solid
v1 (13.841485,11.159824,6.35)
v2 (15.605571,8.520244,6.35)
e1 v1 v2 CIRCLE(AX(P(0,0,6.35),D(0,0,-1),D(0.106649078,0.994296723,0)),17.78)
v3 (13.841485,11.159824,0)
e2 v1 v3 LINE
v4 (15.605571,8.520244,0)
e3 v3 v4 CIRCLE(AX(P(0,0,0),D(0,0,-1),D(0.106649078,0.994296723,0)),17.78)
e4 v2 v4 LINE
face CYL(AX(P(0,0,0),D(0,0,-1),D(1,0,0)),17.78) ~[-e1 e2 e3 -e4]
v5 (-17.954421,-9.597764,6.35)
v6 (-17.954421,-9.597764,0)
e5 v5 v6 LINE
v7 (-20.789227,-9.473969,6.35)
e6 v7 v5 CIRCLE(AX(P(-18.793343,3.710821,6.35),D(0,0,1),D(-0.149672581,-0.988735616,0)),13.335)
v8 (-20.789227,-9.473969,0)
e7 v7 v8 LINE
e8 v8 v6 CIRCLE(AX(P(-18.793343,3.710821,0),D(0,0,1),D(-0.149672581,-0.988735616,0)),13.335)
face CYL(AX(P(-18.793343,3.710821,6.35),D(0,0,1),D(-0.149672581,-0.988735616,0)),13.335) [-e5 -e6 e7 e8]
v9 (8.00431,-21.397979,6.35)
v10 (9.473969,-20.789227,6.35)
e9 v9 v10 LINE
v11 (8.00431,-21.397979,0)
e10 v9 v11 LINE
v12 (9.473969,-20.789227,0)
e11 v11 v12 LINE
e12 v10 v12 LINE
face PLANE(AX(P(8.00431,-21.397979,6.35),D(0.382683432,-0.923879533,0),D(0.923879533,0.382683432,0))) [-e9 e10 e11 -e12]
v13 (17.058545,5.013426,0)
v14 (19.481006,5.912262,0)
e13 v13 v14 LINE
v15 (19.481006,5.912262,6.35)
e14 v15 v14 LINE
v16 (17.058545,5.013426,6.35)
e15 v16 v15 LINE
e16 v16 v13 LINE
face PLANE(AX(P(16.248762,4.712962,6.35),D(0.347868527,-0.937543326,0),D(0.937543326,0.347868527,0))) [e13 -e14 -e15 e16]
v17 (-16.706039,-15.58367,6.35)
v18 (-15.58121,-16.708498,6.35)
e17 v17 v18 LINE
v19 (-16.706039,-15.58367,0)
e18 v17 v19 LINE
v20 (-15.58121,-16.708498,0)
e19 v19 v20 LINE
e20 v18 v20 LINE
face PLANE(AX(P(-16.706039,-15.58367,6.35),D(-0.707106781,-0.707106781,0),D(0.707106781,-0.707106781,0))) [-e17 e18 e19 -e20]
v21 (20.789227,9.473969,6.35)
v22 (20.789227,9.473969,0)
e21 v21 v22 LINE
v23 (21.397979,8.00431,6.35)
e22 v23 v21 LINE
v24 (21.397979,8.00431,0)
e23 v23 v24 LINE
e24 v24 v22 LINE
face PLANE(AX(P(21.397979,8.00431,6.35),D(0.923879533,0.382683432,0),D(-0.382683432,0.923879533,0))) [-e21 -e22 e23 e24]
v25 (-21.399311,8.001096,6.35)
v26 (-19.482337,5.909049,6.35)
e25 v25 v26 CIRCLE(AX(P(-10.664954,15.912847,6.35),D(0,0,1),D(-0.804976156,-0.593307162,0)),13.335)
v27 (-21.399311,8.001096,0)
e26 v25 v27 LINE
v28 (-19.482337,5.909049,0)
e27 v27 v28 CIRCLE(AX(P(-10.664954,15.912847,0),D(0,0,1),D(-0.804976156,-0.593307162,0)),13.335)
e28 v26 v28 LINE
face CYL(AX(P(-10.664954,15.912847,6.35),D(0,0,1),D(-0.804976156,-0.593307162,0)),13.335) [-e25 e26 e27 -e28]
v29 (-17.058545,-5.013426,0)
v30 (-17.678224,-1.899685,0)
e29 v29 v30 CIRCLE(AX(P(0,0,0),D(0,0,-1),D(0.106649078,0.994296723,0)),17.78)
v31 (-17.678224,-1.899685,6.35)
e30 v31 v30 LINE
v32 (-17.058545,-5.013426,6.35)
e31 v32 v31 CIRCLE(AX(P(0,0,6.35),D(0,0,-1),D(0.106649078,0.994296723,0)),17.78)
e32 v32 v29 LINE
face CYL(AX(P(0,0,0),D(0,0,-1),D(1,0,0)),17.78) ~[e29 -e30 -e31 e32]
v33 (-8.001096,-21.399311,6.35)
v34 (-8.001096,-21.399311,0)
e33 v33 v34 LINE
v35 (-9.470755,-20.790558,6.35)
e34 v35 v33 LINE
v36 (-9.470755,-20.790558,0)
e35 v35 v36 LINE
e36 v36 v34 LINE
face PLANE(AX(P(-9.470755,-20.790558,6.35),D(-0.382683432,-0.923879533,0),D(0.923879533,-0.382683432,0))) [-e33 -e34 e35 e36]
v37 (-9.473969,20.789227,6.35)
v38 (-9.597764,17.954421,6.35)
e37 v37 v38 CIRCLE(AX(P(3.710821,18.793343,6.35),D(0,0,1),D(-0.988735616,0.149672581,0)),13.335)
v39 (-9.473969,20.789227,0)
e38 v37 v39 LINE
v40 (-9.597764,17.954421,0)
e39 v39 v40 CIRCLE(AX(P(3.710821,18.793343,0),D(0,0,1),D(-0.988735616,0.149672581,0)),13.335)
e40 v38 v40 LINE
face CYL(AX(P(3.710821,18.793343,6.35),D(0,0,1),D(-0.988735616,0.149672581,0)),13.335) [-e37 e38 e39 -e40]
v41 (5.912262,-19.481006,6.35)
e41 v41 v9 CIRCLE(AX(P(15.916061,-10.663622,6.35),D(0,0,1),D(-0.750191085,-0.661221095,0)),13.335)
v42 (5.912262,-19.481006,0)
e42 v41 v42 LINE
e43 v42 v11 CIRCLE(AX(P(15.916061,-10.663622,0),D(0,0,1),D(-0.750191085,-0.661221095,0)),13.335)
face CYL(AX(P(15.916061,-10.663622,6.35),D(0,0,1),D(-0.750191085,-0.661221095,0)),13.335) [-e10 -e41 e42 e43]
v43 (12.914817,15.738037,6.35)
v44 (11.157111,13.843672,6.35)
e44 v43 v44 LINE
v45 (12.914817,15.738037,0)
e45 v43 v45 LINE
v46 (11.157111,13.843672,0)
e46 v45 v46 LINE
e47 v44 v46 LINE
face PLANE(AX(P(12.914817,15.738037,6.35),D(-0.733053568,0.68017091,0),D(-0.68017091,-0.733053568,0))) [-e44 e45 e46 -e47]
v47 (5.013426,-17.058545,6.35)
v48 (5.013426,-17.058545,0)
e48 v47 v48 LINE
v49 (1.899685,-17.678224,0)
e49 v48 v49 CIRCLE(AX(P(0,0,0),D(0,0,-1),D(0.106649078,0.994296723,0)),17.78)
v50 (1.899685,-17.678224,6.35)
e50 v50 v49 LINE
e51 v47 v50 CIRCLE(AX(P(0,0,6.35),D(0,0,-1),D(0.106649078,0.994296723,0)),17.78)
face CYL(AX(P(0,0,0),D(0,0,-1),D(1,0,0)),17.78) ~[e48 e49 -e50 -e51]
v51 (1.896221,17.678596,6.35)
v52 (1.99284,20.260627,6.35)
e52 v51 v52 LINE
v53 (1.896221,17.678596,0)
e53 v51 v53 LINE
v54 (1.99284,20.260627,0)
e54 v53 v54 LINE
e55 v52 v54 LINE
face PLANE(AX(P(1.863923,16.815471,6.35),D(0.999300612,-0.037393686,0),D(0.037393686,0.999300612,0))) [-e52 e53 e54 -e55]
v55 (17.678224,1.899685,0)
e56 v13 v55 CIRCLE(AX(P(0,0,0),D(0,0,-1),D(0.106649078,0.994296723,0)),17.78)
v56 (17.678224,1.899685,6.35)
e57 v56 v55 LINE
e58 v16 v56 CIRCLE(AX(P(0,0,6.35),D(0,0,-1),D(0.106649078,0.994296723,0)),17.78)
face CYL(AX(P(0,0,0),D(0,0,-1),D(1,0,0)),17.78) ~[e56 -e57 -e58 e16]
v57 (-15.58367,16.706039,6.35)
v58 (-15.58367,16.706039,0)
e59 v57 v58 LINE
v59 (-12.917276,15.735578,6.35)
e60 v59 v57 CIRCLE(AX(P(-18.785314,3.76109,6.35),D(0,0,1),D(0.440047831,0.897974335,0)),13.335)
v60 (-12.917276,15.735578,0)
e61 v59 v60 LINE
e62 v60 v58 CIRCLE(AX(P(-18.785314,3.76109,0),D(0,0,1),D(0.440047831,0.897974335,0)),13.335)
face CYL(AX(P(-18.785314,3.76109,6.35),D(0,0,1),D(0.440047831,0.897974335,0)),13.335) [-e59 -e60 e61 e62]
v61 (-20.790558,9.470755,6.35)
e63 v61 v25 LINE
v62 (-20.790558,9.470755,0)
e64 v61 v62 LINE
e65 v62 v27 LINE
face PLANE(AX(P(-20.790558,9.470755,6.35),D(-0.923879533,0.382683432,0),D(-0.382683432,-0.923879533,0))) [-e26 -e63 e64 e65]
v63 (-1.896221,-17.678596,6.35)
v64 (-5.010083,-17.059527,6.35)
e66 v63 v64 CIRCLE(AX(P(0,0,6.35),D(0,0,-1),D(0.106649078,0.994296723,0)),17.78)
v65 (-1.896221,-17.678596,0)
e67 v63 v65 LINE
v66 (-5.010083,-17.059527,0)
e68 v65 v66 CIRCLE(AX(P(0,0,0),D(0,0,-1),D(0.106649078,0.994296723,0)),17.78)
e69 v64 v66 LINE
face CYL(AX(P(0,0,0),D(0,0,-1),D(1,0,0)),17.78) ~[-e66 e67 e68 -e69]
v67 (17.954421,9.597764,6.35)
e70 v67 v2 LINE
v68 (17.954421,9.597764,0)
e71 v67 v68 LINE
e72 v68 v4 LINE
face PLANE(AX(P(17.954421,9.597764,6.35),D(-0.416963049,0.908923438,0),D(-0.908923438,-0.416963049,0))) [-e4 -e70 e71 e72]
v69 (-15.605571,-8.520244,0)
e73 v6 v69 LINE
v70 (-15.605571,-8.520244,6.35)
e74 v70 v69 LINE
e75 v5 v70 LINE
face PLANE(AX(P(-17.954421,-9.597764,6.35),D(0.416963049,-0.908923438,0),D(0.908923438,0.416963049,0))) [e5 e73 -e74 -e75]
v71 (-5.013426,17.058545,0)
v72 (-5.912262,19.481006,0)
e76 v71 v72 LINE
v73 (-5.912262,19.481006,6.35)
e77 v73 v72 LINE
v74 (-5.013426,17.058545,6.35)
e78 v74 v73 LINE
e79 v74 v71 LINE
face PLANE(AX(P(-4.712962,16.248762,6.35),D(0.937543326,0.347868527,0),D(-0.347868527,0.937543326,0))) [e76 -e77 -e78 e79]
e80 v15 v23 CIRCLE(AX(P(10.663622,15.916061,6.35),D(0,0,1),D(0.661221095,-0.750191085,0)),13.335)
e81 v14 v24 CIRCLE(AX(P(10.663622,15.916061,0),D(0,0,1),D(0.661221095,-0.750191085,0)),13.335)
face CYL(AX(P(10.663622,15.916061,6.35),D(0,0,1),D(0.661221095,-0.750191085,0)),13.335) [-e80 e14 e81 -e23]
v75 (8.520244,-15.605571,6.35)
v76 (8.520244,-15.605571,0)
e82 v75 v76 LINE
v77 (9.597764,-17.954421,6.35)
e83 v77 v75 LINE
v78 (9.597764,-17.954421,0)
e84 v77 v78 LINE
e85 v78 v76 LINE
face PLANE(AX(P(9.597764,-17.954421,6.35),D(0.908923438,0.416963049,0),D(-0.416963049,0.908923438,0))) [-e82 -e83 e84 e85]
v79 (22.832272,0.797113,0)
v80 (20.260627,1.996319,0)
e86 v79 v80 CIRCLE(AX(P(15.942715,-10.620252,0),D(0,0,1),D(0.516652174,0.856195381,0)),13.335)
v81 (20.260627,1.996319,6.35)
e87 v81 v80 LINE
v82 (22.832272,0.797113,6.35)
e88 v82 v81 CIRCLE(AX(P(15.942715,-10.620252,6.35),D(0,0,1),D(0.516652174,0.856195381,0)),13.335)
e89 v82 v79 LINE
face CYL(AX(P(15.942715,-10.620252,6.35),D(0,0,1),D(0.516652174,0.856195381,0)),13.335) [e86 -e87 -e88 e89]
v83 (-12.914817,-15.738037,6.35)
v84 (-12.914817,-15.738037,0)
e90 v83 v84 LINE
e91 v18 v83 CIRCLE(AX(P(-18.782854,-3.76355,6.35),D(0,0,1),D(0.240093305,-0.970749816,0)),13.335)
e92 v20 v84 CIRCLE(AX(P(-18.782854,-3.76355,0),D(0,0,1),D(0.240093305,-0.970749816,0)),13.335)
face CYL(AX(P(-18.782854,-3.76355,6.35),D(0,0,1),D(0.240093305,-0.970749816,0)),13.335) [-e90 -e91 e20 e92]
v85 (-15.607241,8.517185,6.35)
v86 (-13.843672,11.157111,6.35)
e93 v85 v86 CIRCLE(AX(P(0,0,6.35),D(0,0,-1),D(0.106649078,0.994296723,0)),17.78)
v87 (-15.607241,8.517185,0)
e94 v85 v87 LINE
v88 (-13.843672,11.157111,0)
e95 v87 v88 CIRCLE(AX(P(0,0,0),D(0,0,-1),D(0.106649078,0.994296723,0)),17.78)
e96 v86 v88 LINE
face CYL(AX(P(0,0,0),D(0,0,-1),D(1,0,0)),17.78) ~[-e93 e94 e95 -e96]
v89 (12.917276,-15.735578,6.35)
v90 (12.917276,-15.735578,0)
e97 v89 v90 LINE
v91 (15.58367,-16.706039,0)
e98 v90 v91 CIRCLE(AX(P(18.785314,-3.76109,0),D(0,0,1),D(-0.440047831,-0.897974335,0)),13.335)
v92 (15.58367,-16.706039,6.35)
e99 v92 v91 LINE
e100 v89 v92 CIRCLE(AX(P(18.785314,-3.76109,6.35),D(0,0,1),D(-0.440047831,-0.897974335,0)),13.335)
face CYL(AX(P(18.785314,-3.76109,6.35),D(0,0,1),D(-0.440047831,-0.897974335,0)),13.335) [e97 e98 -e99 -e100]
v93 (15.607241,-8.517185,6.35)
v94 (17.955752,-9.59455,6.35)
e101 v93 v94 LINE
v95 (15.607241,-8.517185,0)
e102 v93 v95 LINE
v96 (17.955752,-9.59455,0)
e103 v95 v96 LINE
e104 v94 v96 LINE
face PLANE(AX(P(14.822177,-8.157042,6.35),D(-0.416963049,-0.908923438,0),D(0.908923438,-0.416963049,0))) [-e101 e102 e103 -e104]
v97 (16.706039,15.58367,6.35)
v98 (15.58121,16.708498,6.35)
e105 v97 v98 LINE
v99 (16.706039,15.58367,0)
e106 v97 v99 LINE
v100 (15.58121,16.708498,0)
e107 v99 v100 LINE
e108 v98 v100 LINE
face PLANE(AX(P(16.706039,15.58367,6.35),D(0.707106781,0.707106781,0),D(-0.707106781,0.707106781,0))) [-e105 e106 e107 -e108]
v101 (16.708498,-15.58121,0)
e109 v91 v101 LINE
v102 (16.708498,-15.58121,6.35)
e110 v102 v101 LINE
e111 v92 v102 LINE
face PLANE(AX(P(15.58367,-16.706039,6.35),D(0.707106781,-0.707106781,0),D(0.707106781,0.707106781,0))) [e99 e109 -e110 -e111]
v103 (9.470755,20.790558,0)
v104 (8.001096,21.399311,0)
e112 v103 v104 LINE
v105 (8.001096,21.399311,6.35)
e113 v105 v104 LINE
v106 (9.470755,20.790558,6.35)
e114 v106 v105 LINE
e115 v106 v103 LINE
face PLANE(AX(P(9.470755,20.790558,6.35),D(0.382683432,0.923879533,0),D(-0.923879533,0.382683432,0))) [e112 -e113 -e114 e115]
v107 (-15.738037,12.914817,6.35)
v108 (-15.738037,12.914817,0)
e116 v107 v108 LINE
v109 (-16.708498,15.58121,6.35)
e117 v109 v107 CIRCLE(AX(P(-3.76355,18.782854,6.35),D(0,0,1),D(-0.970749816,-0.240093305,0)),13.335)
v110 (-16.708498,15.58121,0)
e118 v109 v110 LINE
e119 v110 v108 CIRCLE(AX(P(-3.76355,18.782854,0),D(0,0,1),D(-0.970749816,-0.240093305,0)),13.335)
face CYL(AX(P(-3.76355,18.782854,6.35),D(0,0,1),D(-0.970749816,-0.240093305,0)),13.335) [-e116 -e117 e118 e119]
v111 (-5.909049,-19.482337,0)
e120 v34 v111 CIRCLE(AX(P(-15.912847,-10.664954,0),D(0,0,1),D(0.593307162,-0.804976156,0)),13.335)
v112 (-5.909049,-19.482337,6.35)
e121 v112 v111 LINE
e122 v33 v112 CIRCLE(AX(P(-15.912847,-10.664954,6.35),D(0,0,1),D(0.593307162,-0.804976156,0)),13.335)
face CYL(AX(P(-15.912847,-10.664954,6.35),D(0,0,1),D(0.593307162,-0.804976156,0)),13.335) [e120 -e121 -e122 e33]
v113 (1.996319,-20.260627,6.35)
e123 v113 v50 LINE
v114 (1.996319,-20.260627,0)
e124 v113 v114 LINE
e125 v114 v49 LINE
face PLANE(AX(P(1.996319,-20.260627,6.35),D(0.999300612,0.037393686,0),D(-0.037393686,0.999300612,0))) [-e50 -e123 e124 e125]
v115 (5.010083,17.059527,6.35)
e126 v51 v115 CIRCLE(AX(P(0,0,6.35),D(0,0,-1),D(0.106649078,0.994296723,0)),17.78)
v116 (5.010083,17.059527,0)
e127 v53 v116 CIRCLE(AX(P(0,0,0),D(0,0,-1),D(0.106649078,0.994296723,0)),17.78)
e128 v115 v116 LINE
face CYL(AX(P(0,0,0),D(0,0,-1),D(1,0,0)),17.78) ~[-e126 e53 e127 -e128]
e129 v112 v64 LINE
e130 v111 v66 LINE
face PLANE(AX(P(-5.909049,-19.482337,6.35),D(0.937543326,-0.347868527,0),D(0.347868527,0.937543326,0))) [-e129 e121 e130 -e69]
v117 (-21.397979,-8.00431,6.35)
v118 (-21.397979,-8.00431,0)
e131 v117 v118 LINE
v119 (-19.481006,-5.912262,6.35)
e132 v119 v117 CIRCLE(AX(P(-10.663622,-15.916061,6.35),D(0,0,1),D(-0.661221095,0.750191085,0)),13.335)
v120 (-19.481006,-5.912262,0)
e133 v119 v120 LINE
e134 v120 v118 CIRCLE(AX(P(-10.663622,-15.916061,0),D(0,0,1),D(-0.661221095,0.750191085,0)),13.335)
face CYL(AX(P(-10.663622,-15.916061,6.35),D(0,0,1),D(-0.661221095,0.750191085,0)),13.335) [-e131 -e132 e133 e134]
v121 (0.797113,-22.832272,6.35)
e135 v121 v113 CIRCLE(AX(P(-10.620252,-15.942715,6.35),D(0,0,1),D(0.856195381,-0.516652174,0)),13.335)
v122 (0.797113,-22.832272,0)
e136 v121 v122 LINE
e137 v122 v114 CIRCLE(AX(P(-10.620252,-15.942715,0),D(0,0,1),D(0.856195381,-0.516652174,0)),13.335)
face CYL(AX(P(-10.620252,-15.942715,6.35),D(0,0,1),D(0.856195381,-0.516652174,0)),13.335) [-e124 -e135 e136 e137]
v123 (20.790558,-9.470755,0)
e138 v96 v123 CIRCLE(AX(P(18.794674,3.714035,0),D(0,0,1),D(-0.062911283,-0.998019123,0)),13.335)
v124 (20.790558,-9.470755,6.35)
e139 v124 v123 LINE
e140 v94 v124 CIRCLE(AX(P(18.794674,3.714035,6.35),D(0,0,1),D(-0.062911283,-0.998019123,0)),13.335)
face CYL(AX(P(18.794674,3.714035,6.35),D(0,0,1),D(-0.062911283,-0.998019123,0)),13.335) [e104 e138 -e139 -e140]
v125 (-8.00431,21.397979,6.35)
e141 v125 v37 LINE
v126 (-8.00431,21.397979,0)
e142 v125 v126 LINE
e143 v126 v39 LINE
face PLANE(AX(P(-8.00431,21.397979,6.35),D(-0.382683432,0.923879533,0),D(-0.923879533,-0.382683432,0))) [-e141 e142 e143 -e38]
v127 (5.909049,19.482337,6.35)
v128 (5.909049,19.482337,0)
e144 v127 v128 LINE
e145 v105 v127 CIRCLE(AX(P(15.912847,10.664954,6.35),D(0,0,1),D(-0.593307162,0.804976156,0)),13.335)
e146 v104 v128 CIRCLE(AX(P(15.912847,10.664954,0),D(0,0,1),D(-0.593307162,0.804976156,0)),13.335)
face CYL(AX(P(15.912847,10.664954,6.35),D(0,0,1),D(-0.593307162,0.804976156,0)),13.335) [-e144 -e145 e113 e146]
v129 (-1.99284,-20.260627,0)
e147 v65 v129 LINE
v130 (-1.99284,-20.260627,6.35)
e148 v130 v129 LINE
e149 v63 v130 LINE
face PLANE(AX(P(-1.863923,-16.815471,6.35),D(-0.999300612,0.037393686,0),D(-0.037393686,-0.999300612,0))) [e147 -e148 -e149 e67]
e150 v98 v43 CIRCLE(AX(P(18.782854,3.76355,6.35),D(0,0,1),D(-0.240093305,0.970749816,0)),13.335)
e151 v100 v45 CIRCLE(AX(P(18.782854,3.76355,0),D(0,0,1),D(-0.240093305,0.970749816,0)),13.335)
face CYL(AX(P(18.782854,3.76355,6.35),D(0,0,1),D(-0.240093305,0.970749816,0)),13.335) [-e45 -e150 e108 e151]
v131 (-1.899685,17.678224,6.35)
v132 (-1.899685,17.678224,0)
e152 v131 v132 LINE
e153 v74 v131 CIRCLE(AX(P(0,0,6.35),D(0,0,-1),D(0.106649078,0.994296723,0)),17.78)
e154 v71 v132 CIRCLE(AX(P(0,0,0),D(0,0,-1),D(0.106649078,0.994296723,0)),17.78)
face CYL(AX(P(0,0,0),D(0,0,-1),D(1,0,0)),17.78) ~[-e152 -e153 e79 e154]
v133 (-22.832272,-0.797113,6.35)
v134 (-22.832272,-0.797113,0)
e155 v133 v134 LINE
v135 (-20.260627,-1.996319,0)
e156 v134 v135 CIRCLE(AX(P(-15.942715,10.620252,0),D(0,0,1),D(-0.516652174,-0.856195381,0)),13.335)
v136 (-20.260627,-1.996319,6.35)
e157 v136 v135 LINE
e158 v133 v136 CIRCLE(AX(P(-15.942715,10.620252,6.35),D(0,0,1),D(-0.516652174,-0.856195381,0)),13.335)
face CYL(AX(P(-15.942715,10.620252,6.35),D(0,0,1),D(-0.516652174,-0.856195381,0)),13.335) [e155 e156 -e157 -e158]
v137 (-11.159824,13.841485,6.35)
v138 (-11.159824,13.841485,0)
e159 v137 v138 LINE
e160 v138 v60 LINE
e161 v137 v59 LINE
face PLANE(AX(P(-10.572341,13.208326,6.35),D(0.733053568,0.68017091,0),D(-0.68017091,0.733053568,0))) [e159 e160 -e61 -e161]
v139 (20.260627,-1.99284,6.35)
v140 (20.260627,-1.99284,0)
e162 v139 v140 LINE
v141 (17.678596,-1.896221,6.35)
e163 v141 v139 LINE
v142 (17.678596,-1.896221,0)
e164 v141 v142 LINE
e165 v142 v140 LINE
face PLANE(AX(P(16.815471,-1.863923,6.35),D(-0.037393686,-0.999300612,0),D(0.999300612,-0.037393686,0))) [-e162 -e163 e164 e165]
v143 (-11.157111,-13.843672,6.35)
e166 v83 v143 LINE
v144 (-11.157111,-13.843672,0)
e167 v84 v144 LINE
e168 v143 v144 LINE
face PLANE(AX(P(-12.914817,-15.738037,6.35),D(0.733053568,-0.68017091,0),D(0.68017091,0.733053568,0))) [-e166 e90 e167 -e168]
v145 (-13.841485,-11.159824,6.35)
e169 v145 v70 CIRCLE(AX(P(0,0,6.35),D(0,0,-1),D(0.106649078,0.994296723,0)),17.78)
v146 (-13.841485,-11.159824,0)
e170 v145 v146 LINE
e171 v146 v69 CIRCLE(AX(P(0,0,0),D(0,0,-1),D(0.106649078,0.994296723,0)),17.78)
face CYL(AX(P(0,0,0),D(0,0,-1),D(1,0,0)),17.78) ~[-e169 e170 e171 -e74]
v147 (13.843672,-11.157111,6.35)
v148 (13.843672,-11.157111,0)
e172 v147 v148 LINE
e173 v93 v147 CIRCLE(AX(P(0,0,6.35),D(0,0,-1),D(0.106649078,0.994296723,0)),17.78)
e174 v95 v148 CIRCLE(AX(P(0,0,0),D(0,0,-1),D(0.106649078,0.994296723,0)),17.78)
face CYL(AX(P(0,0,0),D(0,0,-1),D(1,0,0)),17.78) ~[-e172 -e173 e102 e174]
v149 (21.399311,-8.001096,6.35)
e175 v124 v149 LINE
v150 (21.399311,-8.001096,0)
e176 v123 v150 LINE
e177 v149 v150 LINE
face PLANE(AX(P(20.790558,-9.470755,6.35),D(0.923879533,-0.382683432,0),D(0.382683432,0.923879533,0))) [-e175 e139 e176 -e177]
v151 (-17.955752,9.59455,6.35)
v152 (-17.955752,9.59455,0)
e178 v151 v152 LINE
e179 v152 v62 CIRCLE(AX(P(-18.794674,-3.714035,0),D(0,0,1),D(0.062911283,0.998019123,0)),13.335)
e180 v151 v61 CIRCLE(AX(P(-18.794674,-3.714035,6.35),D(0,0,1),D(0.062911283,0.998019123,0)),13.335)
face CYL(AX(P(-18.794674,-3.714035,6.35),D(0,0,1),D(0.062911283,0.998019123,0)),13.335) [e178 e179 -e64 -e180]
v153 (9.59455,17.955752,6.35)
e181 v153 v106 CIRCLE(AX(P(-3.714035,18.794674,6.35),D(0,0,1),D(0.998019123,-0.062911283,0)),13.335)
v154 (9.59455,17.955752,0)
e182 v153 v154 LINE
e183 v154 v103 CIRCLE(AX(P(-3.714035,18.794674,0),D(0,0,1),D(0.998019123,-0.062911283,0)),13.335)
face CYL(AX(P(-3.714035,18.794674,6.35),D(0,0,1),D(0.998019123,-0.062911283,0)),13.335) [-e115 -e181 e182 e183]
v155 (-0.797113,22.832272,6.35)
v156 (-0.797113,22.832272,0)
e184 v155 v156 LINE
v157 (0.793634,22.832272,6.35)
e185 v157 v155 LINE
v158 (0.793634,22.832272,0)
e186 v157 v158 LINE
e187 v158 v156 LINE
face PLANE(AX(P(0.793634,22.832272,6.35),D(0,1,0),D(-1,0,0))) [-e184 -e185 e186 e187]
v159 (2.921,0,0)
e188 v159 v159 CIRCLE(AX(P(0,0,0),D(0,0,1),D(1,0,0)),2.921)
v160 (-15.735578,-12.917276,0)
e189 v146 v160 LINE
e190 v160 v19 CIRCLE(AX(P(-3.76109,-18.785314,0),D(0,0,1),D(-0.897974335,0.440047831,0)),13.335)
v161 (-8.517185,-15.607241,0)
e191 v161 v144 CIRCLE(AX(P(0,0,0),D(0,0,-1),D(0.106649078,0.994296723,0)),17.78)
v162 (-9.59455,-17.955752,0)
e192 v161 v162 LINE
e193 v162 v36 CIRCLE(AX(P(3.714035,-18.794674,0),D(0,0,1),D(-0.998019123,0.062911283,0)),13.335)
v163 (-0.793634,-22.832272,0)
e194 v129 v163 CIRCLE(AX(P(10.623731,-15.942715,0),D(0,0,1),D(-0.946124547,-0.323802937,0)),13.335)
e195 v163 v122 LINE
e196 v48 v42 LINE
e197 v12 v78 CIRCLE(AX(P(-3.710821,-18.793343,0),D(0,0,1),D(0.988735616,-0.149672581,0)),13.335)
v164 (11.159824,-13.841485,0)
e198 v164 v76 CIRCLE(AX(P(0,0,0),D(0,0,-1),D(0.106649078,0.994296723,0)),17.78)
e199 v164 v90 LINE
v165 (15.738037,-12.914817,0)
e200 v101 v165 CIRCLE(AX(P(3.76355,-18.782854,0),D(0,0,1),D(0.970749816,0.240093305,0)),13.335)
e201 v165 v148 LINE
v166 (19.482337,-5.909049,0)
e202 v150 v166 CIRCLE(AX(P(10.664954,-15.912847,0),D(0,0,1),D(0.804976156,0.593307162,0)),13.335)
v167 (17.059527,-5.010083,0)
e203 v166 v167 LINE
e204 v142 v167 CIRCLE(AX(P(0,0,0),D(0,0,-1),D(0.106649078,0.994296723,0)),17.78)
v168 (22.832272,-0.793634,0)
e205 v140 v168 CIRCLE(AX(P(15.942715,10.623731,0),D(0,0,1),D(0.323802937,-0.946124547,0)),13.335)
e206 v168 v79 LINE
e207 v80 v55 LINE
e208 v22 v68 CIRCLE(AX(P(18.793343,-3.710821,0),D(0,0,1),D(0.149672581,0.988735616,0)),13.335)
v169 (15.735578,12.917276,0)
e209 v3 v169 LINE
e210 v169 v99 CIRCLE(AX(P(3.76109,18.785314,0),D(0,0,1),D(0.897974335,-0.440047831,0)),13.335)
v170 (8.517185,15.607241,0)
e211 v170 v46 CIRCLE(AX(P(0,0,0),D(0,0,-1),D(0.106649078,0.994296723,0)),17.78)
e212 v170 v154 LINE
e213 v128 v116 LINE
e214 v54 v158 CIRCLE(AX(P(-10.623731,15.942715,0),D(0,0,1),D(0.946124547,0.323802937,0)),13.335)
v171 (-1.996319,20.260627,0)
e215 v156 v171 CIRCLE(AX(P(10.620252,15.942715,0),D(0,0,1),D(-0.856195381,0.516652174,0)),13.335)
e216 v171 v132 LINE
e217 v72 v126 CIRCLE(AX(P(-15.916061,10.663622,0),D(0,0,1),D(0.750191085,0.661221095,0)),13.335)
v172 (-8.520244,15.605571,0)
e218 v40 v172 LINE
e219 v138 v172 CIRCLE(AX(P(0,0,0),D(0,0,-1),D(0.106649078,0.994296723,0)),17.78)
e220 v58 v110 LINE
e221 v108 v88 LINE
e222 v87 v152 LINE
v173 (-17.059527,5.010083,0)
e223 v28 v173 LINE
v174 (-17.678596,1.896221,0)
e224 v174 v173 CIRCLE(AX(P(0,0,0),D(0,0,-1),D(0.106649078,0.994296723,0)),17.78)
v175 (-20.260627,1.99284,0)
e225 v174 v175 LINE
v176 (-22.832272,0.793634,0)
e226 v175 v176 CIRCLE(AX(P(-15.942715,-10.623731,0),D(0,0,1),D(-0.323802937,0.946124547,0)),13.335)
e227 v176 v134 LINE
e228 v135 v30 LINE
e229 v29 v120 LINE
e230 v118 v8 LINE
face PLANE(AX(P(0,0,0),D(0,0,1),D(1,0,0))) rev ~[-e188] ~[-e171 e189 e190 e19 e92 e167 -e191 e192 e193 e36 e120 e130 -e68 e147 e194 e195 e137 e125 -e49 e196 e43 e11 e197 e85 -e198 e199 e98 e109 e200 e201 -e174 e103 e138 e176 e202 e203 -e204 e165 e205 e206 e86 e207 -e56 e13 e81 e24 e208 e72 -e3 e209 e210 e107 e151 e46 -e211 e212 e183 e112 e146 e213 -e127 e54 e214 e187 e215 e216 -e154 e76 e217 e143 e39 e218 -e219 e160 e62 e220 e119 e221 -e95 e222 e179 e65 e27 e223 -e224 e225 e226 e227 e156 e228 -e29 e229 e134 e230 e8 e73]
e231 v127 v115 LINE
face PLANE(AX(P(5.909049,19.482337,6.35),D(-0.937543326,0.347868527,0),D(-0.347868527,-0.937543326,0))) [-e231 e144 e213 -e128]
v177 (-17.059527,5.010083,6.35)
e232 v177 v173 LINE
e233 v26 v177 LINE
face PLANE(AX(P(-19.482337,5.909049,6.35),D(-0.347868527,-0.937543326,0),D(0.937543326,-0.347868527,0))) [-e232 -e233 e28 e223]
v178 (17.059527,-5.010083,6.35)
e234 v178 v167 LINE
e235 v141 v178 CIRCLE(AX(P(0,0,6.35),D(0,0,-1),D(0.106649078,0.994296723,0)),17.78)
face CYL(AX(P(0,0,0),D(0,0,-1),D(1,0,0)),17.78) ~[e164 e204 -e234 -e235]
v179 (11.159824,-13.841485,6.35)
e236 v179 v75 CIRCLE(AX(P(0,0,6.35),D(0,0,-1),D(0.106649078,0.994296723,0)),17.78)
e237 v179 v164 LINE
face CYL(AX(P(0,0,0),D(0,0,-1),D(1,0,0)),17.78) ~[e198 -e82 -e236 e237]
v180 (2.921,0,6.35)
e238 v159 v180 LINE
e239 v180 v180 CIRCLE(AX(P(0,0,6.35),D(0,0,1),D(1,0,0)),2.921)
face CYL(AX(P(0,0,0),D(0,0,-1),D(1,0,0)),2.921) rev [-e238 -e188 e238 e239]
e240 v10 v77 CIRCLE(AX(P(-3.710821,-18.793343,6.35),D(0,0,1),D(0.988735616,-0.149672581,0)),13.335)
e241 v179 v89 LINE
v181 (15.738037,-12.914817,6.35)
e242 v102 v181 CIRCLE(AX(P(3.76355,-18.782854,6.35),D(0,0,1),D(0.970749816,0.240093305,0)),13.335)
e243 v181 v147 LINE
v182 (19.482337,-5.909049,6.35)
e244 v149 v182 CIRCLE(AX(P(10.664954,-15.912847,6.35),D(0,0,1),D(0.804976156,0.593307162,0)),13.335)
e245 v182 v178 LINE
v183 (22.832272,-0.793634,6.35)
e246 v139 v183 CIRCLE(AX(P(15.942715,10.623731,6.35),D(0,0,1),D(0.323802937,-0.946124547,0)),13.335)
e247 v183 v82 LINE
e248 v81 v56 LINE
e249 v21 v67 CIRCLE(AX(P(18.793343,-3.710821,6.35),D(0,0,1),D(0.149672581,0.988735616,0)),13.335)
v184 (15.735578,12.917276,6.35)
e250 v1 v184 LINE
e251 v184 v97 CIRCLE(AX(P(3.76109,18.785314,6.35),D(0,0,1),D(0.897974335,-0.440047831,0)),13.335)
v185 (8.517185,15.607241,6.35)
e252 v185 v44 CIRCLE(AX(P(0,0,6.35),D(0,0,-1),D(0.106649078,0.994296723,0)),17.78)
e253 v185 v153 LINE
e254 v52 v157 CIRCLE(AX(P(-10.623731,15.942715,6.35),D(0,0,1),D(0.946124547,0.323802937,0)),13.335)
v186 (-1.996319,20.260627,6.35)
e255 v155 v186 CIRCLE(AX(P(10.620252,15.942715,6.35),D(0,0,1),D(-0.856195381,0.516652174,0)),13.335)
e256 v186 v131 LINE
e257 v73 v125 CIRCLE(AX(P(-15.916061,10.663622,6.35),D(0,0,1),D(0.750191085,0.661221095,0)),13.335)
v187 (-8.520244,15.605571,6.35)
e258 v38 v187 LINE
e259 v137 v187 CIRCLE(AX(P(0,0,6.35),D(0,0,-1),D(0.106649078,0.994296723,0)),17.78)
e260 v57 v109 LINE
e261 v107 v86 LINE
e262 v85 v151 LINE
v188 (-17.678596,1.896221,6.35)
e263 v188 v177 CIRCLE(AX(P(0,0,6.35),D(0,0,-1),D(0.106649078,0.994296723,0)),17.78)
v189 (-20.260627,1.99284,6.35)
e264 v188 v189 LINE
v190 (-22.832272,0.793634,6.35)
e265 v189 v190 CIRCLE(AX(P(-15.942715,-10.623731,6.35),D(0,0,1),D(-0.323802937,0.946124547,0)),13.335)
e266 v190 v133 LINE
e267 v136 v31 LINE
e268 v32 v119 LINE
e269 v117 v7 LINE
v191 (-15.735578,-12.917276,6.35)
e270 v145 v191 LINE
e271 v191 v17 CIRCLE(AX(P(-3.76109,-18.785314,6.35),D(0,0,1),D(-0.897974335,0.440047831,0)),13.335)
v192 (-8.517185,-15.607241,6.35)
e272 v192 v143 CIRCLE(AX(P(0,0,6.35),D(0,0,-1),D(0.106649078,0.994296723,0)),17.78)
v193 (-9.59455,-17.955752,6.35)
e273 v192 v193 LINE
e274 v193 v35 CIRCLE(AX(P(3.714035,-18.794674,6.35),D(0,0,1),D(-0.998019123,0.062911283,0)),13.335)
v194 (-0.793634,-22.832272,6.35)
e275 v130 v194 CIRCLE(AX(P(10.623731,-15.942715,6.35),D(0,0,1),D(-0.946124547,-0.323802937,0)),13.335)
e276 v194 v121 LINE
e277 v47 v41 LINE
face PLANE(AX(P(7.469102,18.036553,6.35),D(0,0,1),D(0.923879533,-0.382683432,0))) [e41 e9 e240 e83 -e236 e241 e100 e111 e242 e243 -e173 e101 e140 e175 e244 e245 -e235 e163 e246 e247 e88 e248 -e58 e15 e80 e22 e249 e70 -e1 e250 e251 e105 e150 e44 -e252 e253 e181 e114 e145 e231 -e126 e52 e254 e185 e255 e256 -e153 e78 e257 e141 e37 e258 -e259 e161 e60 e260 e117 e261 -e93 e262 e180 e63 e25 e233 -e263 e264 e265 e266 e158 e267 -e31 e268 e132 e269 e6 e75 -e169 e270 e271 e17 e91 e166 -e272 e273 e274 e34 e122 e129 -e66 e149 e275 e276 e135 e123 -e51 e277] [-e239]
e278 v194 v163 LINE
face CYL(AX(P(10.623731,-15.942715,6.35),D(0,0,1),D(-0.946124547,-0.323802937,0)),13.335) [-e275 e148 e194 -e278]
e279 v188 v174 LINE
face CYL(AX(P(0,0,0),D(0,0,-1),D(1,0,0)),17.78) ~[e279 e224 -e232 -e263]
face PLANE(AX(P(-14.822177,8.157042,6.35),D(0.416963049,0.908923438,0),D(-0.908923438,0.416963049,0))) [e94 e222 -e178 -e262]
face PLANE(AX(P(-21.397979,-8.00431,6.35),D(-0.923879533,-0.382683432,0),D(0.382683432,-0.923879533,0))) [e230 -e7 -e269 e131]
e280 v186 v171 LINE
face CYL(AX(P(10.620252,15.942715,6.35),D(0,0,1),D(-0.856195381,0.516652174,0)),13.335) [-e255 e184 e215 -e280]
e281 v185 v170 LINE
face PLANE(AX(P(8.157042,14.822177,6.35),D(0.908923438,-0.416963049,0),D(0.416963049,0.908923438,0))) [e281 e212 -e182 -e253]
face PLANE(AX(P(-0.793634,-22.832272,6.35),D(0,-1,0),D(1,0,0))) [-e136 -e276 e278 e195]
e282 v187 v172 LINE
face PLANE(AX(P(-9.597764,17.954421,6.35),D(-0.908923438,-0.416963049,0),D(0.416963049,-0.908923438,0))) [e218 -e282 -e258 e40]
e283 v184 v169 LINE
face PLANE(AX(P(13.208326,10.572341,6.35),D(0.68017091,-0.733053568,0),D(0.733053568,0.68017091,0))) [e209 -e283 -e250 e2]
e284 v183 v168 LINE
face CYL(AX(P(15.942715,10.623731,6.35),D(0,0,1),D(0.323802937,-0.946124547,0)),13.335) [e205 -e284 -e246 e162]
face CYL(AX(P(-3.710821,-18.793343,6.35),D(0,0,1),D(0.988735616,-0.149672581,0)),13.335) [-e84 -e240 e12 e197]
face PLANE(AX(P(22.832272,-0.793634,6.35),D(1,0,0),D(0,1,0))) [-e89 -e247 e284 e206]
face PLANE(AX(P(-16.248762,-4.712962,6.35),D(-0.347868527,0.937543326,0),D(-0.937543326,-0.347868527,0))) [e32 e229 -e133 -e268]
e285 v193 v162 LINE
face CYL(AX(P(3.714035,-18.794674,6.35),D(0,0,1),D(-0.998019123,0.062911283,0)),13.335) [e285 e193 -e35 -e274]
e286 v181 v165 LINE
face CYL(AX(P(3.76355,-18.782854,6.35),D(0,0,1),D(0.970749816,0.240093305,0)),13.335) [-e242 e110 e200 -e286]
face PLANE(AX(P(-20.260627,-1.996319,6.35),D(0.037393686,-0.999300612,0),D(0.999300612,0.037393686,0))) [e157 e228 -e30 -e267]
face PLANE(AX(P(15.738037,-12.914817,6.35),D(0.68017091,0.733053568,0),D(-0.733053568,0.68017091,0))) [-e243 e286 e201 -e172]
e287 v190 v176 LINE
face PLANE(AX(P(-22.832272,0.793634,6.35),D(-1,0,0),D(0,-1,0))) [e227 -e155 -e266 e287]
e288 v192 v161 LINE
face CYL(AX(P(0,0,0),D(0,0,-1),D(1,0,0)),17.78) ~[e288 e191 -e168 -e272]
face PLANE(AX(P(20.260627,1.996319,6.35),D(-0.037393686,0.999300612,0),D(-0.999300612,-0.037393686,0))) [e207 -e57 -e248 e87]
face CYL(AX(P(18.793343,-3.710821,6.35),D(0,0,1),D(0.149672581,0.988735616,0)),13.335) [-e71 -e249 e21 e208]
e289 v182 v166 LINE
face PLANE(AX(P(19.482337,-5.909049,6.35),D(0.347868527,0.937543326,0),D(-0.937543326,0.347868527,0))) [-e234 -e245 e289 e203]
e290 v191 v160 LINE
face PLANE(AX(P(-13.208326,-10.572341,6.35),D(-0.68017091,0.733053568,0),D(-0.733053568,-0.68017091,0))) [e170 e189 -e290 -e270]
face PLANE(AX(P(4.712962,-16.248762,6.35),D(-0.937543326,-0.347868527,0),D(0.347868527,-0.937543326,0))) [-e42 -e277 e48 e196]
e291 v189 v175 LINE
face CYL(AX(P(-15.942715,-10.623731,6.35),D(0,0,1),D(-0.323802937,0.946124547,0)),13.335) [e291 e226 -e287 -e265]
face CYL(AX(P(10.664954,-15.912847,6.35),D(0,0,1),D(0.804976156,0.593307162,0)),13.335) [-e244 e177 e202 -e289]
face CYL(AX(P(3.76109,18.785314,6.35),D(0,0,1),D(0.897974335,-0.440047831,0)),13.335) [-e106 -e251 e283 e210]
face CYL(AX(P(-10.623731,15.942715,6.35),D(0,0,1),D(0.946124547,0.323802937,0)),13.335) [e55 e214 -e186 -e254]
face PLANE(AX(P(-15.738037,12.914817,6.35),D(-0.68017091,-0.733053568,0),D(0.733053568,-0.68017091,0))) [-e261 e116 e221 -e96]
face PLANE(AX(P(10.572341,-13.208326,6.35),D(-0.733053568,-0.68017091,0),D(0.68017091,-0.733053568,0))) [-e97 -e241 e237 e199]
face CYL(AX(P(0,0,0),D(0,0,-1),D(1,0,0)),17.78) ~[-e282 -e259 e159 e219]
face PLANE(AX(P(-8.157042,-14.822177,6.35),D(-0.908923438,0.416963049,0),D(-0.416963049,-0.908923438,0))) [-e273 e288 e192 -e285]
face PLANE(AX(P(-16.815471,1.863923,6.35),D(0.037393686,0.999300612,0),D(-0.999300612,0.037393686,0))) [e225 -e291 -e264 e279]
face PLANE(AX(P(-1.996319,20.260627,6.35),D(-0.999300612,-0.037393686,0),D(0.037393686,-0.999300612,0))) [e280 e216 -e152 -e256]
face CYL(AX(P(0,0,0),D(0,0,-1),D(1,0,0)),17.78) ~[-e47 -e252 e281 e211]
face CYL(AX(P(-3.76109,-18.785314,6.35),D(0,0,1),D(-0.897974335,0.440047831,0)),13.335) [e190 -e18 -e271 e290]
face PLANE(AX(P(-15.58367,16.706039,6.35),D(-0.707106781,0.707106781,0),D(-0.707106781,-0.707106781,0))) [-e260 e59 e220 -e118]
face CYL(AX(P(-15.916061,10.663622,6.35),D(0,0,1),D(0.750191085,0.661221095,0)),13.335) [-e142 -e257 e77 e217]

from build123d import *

# Parameters (mm, degrees)
F0_R            = 17.78
F0_R_2          = 2.921
F1_DEPTH        = 6.35
F3_DEPTH        = 6.35
F3_COPIES_COUNT = 16


# Not quite as in the source:
# - a pattern or mirror of a feature is missing from the dataset's text; its kind, count and spacing are read off the source's solid


with BuildPart() as f1:
    # F0 (on Top) → F1 (new body)
    with BuildSketch(Plane.XY):
        Circle(F0_R)
        Circle(F0_R_2, mode=Mode.SUBTRACT)
    extrude(amount=F1_DEPTH)

    # F2 (on face) → F3 (join)
    with BuildSketch(Plane.XY.offset(6.35)):
        with BuildLine():
            Line((1.8639226102, 16.8154710155), (1.9928398674, 20.2606273541))
            ThreePointArc((1.9928398674, 20.2606273541), (1.461833226, 21.5784372569), (0.7936344478, 22.8322719293))
            Line((0.7936344478, 22.8322719293), (-0.0017393364, 22.8322719293))
            Line((-0.0017393364, 22.8322719293), (-0.7971131206, 22.8322719293))
            ThreePointArc((-0.7971131206, 22.8322719293), (-1.4653118988, 21.5784372569), (-1.9963185402, 20.2606273541))
            Line((-1.9963185402, 20.2606273541), (-1.8674012831, 16.8154710155))
            Line((-1.8674012831, 16.8154710155), (-0.0017393364, 16.8154710155))
            Line((-0.0017393364, 16.8154710155), (1.8639226102, 16.8154710155))
        make_face()
    f3 = extrude(amount=-F3_DEPTH)

    # F3_copies: F3 ×16 about axis
    f3_copies_axis = Axis((0, 0, 0), (0, 0, 1))
    for i in range(1, F3_COPIES_COUNT):
        add(f3.rotate(f3_copies_axis, i * 360 / F3_COPIES_COUNT))


solid = f1.part
